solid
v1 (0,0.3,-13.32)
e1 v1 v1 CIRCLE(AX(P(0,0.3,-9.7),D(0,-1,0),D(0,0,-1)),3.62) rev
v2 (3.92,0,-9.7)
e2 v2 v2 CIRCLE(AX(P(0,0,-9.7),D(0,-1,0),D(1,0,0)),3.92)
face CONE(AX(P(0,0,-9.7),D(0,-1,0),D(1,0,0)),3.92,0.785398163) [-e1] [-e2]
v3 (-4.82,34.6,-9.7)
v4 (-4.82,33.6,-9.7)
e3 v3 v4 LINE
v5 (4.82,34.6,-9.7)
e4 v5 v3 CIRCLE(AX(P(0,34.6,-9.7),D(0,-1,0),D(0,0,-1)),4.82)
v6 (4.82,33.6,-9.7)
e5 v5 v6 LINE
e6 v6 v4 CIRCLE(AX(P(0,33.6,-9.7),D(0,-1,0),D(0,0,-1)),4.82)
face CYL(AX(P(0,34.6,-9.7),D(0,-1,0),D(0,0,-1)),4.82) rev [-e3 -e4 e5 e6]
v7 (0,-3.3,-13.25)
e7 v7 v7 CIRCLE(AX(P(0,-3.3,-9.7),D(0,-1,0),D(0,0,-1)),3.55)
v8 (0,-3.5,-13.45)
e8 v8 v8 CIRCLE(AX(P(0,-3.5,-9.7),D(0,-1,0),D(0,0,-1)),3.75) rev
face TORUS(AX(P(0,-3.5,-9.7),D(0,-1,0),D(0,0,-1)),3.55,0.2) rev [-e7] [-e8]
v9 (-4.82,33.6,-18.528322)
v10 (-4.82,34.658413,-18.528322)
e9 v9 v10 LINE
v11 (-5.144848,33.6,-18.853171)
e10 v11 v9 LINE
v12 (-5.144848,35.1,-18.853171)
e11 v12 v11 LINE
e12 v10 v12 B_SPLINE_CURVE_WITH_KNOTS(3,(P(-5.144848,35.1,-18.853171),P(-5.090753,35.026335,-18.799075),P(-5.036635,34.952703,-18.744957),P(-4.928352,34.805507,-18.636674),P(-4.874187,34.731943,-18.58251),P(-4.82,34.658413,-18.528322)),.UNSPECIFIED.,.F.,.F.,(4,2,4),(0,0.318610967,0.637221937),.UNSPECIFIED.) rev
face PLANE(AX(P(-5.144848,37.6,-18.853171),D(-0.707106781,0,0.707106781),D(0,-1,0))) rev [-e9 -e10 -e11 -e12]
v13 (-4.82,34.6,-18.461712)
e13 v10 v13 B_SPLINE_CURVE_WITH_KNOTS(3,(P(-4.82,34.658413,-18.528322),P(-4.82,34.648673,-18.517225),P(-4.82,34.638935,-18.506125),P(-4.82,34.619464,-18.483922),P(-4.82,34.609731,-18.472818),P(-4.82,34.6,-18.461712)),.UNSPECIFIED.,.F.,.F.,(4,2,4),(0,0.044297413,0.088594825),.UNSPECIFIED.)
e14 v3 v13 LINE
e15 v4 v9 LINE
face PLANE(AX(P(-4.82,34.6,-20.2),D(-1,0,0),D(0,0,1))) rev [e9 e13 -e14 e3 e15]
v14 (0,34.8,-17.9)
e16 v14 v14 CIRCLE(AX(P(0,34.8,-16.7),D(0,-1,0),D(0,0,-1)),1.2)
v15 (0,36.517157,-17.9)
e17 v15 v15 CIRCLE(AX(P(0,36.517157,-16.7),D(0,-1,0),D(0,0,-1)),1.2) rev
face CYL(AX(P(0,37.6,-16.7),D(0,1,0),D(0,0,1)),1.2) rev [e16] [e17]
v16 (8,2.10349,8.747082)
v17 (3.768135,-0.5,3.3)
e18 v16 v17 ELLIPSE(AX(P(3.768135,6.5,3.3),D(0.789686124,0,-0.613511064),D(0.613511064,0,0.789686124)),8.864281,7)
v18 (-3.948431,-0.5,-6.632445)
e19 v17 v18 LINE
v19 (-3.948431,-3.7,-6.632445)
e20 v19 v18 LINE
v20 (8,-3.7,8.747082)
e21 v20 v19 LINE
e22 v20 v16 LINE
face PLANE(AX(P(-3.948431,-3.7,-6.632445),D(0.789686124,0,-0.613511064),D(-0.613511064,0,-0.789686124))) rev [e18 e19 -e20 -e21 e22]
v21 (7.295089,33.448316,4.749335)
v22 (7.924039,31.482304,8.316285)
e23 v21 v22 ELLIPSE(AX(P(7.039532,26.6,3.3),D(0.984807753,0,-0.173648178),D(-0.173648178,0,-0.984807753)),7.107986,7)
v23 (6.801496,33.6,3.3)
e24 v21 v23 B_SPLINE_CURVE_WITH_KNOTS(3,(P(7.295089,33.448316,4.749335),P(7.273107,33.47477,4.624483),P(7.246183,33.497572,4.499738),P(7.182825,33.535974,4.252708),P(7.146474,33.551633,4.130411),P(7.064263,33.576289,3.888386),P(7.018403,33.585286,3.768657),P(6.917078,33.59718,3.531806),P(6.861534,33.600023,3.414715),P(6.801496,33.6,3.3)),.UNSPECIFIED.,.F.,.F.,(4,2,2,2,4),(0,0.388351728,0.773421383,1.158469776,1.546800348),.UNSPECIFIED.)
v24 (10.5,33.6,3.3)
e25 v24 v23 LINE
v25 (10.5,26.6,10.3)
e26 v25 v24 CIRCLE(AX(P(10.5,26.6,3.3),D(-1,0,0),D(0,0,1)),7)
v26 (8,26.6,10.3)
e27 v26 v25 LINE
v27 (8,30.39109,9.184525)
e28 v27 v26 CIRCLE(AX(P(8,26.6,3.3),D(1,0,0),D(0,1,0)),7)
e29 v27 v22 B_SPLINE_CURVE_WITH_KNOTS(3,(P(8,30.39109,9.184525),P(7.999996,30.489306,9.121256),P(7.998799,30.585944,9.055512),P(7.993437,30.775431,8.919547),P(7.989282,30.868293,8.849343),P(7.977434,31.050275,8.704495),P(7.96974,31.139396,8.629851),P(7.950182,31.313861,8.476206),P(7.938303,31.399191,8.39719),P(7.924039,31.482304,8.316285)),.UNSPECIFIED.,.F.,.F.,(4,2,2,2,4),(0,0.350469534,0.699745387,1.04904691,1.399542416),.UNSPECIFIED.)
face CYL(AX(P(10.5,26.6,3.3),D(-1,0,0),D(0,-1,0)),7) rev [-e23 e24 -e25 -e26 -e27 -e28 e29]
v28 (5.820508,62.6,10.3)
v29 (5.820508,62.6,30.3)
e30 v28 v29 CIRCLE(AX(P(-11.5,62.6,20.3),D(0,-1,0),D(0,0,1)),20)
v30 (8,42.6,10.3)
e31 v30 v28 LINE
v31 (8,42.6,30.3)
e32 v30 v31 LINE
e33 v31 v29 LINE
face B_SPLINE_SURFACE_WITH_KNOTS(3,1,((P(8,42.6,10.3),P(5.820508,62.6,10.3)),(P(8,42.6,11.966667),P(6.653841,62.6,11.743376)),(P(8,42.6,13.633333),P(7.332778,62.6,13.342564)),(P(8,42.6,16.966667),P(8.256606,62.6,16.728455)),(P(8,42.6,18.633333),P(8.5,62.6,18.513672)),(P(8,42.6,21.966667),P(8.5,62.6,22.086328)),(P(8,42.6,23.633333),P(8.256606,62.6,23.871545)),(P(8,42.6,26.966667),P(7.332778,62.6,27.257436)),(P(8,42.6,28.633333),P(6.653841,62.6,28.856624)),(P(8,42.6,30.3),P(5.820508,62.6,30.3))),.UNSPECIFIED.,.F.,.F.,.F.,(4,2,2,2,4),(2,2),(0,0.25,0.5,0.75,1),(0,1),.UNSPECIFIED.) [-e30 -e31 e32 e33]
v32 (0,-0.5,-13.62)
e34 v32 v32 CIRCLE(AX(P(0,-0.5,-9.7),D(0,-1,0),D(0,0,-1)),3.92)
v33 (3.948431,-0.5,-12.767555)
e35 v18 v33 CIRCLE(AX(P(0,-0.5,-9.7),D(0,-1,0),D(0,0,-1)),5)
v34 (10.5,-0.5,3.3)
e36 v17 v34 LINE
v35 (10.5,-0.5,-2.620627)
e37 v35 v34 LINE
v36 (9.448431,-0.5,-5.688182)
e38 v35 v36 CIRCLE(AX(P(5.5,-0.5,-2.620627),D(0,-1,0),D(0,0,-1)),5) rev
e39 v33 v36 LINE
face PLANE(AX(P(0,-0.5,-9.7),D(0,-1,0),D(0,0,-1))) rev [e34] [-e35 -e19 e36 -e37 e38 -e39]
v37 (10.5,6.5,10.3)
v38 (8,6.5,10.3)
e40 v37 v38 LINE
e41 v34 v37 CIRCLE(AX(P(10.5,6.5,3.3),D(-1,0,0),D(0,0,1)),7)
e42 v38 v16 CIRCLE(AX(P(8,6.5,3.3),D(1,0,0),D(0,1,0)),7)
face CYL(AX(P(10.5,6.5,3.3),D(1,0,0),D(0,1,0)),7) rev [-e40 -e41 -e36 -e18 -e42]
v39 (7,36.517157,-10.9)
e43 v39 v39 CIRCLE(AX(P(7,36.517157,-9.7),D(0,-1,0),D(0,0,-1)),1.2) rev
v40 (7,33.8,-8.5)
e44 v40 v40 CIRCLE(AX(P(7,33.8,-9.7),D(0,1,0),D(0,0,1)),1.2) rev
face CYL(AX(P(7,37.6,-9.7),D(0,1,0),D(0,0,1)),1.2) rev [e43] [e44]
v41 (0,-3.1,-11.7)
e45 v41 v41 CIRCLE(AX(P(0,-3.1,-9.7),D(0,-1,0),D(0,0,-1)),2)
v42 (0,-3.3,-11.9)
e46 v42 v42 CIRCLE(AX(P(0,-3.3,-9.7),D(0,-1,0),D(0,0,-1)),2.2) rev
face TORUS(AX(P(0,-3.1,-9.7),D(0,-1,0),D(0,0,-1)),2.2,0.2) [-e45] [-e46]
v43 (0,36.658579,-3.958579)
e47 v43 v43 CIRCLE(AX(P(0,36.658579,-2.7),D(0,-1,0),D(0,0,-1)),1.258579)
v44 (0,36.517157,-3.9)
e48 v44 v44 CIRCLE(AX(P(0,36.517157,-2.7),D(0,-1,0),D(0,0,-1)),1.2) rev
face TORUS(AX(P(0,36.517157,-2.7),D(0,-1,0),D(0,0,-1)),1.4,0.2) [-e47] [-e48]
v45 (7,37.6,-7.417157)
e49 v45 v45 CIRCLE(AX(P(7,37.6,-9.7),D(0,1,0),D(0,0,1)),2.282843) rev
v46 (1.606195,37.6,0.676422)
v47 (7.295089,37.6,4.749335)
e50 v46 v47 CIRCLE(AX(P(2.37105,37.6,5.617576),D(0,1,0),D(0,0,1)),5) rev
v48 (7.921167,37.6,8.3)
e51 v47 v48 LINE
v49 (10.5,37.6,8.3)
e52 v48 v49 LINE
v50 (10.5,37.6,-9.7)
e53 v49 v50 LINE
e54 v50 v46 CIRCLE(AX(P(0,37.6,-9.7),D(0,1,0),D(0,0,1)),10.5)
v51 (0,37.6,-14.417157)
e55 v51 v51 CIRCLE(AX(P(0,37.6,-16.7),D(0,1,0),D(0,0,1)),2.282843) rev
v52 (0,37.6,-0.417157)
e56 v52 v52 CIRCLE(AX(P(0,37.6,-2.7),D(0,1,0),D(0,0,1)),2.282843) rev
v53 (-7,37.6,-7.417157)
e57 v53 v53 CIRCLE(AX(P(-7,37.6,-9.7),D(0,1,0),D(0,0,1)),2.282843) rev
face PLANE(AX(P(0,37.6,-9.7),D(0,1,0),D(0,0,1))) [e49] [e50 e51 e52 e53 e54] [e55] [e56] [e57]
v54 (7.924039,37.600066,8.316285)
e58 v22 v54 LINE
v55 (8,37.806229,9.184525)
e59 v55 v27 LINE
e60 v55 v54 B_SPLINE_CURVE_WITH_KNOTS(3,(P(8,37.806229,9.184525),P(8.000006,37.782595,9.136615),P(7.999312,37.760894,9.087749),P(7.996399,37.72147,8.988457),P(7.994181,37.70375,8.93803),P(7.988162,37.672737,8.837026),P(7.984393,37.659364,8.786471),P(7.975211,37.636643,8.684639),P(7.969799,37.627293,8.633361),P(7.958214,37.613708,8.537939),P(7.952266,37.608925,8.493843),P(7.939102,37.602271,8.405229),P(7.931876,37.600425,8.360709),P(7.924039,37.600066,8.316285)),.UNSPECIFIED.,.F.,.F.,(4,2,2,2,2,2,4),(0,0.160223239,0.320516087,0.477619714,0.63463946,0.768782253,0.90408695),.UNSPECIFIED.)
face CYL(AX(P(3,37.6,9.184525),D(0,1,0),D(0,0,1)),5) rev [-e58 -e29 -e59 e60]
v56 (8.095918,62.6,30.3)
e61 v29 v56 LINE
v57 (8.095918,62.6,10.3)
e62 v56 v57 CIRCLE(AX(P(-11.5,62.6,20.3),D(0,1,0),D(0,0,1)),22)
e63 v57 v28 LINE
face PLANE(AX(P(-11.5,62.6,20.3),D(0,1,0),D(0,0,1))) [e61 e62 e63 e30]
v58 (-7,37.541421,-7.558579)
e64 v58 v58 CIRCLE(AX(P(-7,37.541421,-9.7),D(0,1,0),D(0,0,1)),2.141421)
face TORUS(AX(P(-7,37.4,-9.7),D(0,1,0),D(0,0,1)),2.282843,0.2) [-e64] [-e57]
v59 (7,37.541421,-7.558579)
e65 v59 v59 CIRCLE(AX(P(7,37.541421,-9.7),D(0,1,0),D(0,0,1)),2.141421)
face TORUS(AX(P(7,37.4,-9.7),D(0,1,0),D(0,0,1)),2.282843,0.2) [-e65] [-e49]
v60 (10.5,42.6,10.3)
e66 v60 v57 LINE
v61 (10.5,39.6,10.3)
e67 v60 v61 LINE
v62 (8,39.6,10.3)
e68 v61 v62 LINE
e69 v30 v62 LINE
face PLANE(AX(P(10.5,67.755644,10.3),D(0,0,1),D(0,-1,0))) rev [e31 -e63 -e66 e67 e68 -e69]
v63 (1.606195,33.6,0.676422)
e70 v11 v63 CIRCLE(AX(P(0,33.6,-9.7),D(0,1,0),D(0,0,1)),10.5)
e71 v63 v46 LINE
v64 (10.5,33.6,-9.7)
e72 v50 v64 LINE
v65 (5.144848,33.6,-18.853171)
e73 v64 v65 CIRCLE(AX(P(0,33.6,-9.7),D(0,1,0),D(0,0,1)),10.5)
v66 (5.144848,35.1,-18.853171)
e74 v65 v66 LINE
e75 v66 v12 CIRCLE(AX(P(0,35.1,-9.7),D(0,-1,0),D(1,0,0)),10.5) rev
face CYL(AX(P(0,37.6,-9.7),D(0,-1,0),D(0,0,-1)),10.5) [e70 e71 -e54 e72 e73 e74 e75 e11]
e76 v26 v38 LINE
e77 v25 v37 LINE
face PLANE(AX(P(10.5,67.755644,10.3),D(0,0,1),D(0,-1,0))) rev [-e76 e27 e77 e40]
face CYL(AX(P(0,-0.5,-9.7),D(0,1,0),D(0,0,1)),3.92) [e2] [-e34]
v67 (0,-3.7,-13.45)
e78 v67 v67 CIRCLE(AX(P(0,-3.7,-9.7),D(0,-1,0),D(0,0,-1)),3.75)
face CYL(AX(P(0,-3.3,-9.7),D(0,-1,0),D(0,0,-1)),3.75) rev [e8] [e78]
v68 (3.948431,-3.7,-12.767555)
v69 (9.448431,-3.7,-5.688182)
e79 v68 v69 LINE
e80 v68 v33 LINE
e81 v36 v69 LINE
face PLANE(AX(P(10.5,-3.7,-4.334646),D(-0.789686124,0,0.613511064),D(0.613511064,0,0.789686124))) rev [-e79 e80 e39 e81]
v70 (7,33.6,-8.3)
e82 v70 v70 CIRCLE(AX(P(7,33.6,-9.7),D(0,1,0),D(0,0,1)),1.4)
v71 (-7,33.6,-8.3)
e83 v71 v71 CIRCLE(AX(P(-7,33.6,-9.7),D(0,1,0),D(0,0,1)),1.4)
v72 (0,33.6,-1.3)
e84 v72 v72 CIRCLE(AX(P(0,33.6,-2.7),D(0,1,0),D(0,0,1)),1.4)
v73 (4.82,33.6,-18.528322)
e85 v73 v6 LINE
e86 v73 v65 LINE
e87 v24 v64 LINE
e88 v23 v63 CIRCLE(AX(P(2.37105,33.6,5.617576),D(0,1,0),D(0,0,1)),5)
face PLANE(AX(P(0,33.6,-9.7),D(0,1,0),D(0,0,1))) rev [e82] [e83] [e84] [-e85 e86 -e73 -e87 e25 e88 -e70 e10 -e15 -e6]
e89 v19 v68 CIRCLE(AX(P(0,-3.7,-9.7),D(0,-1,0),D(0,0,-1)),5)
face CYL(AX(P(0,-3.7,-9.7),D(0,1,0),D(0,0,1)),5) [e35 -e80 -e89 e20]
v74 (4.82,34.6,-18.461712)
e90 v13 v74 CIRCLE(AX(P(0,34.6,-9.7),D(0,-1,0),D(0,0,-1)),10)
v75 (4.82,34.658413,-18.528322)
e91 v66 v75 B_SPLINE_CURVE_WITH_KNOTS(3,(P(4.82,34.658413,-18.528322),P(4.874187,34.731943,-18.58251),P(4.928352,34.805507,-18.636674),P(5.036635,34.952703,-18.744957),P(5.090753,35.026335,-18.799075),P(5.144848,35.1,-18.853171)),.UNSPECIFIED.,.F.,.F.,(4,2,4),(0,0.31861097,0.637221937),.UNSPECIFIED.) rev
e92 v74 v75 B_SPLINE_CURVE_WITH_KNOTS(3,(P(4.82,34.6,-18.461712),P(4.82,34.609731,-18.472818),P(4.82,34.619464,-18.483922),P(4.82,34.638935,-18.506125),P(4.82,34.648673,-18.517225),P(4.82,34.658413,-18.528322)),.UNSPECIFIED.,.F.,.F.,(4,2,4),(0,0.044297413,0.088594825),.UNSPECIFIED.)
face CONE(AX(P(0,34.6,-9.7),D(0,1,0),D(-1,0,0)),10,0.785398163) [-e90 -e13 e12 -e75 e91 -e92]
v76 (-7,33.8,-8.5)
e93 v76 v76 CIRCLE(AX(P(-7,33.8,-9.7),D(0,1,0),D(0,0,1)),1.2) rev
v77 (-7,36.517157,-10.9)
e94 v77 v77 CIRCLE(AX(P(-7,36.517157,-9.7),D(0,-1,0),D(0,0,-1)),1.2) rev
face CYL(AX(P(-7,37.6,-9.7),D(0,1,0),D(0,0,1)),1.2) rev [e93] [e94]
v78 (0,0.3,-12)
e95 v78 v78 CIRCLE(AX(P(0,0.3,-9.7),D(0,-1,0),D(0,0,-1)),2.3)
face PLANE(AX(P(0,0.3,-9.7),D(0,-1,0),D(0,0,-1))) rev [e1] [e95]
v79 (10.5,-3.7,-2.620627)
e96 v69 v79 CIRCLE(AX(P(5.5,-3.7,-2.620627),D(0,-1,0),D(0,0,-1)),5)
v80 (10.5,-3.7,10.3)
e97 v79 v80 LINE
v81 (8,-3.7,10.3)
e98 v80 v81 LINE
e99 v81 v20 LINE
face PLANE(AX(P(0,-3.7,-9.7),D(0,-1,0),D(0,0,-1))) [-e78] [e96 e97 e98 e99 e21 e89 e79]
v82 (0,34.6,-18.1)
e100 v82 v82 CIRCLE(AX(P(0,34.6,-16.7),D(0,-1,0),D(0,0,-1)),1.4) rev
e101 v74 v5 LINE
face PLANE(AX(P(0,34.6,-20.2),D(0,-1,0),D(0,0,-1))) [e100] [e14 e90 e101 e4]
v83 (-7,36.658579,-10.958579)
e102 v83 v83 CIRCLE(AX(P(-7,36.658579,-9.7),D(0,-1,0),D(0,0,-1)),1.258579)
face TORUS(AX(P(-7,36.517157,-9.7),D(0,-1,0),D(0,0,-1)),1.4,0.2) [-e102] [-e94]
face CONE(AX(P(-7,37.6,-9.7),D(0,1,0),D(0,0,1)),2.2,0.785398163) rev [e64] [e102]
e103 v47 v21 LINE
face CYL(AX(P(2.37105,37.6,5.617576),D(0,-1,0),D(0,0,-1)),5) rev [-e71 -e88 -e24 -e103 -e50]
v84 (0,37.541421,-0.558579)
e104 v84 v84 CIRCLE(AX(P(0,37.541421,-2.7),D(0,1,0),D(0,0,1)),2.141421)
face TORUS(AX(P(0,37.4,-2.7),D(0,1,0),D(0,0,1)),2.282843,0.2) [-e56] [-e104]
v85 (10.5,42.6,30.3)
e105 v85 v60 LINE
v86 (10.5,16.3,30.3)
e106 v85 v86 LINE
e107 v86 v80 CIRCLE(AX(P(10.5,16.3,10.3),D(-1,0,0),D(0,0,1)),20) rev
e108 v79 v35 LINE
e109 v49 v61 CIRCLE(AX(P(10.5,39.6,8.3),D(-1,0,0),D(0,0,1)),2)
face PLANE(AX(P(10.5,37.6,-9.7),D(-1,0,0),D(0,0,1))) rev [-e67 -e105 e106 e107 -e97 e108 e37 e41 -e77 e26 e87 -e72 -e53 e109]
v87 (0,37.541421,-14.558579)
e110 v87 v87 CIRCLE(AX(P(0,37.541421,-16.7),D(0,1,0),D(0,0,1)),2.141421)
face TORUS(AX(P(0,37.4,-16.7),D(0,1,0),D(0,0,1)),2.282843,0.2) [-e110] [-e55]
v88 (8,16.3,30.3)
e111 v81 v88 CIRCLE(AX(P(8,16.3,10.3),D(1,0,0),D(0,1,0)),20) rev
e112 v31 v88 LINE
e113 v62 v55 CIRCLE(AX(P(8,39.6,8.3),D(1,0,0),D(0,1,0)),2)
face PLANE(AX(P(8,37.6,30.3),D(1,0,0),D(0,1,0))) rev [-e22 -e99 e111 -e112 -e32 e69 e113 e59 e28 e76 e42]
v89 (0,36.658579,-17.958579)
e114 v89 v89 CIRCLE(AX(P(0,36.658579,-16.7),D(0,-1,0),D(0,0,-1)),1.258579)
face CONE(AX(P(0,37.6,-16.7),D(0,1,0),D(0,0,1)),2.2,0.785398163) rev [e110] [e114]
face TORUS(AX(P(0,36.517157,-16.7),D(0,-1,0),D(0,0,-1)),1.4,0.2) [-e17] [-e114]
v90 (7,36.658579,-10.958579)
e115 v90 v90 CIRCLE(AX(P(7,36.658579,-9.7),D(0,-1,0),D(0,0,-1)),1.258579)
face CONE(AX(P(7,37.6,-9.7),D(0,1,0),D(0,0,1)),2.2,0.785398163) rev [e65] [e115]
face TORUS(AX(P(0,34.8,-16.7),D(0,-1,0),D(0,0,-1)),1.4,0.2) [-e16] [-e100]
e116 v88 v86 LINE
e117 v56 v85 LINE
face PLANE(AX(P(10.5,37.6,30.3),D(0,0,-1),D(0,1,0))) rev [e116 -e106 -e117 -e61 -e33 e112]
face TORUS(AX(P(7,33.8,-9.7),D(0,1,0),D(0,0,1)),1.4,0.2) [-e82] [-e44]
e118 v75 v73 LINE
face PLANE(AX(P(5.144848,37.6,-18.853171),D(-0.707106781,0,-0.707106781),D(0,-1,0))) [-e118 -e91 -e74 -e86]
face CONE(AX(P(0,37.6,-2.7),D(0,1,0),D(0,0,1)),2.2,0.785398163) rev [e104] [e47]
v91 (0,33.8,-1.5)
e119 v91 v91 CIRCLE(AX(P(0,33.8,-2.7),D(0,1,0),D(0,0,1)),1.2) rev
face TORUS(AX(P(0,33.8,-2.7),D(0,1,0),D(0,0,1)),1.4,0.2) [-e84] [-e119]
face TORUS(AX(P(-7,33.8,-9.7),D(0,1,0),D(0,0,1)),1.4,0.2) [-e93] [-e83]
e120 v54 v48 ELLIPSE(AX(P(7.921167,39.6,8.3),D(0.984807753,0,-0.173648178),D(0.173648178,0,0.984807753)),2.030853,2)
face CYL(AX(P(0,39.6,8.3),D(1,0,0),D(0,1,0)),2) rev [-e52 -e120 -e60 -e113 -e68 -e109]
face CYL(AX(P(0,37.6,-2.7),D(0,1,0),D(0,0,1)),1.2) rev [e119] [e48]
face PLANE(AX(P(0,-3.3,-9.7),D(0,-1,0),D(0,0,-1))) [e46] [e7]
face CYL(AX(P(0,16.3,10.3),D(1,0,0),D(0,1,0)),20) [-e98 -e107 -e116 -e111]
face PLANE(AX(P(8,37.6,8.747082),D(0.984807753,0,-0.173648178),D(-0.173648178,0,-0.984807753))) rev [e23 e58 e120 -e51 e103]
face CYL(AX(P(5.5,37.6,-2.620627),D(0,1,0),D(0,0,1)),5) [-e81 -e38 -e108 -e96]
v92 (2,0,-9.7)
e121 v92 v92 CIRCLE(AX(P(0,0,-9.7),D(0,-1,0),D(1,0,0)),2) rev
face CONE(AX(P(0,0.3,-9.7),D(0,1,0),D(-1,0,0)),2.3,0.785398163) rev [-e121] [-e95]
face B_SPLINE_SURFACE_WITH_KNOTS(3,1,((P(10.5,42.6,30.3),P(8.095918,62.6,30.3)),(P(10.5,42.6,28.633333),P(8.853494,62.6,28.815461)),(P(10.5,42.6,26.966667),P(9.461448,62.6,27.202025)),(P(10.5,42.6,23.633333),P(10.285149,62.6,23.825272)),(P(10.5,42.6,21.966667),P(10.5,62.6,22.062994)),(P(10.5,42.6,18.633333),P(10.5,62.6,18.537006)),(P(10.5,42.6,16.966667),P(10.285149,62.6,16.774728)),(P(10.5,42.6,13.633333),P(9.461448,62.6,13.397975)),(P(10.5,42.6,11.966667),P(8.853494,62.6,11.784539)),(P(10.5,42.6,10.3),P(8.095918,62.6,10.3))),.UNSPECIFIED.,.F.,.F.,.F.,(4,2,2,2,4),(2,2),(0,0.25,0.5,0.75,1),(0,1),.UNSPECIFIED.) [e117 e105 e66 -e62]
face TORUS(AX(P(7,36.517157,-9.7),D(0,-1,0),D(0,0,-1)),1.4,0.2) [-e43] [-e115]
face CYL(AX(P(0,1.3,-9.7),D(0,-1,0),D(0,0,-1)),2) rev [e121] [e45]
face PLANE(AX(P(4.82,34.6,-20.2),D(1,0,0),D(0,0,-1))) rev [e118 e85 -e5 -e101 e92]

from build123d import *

# Parameters (mm, degrees)
BOSS_EXTRUDE1_DEPTH                                 = 4
CSK_FOR_M2_COUNTERSUNK_FLAT_HEAD_SCREW1_D           = 2.4
CSK_FOR_M2_COUNTERSUNK_FLAT_HEAD_SCREW1_DEPTH       = 4
CSK_FOR_M2_COUNTERSUNK_FLAT_HEAD_SCREW1_CSINK_D     = 4.4
CSK_FOR_M2_COUNTERSUNK_FLAT_HEAD_SCREW1_CSINK_ANGLE = 90
CSK_FOR_M2_COUNTERSUNK_FLAT_HEAD_SCREW1_TIP         = 0.721032743
CUT_EXTRUDE1_DEPTH                                  = 1
BOSS_EXTRUDE2_START                                 = 0.2
SKETCH6_R                                           = 3.92
BOSS_EXTRUDE2_DEPTH                                 = 0.8
BOSS_EXTRUDE3_DEPTH                                 = 3.2
SKETCH10_R                                          = 2
CUT_EXTRUDE2_DEPTH                                  = 5
SKETCH11_R                                          = 3.75
CUT_EXTRUDE3_DEPTH                                  = 0.4
SKETCH12_W                                          = 2.5
SKETCH12_H                                          = 20
BOSS_EXTRUDE4_DEPTH                                 = 43.1
FILLET1_R                                           = 7
FILLET2_R                                           = 20
CHAMFER1_SIZE                                       = 0.3
FILLET3_R                                           = 0.2
CHAMFER2_SIZE                                       = 0.5
FILLET4_R                                           = 0.2
FILLET6_R                                           = 5
FILLET7_R                                           = 2


with BuildPart() as part:
    # Sketch2 → Boss-Extrude1 (new body)
    with BuildSketch(Plane(origin=(0, 33.6, 0), x_dir=(1, 0, 0), z_dir=(0, 1, 0))):
        with BuildLine():
            Line((10.5, 9.7), (10.5, -8.747082129))
            Line((10.5, -8.747082129), (10.5, -30.3))
            Line((10.5, -30.3), (8, -30.3))
            Line((8, -30.3), (8, -8.747082129))
            Line((8, -8.747082129), (6.236730193, 1.252917871))
            ThreePointArc((6.236730193, 1.252917871), (-9.373784375, 14.430979443), (10.5, 9.7))
        make_face()
    extrude(amount=BOSS_EXTRUDE1_DEPTH)

    # CSK for M2 Countersunk Flat Head Screw1
    with Locations(Plane(origin=(0, 37.6, 0), x_dir=(1, 0, 0), z_dir=(0, 1, 0))):
        with Locations((0, 2.7), (7, 9.7), (0, 16.7), (-7, 9.7)):
            CounterSinkHole(CSK_FOR_M2_COUNTERSUNK_FLAT_HEAD_SCREW1_D / 2, CSK_FOR_M2_COUNTERSUNK_FLAT_HEAD_SCREW1_CSINK_D / 2, depth=CSK_FOR_M2_COUNTERSUNK_FLAT_HEAD_SCREW1_DEPTH, counter_sink_angle=CSK_FOR_M2_COUNTERSUNK_FLAT_HEAD_SCREW1_CSINK_ANGLE)
            with Locations((0, 0, -(CSK_FOR_M2_COUNTERSUNK_FLAT_HEAD_SCREW1_DEPTH + CSK_FOR_M2_COUNTERSUNK_FLAT_HEAD_SCREW1_TIP / 2))):  # 118° drill point
                Cone(0, CSK_FOR_M2_COUNTERSUNK_FLAT_HEAD_SCREW1_D / 2, CSK_FOR_M2_COUNTERSUNK_FLAT_HEAD_SCREW1_TIP, mode=Mode.SUBTRACT)

    # Sketch5 → Cut-Extrude1 (cut)
    with BuildSketch(Plane.XZ.offset(-33.6)):
        with BuildLine():
            Line((-4.82, -20.2), (-4.82, -9.7))
            ThreePointArc((-4.82, -9.7), (0, -4.88), (4.82, -9.7))
            Line((4.82, -9.7), (4.82, -20.2))
            ThreePointArc((4.82, -20.2), (0, -25.02), (-4.82, -20.2))
        make_face()
    extrude(amount=-CUT_EXTRUDE1_DEPTH, mode=Mode.SUBTRACT)



with BuildPart() as body_2:
    # Sketch6 → Boss-Extrude2 (new body)
    with BuildSketch(Plane.XZ.offset(-0.5).offset(BOSS_EXTRUDE2_START)):
        with Locations(Location((0, -9.7, 0), (0, 0, 270))):
            Circle(SKETCH6_R)
    extrude(amount=BOSS_EXTRUDE2_DEPTH)

    # Sketch7 → Boss-Extrude3 (add)
    with BuildSketch(Plane.XZ.offset(0.5)):
        with BuildLine():
            Line((-3.948430619, -6.632444679), (8, 8.747082129))
            Line((8, 8.747082129), (8, 30.3))
            Line((8, 30.3), (10.5, 30.3))
            Line((10.5, 30.3), (10.5, -4.334645582))
            Line((10.5, -4.334645582), (3.948430619, -12.767555321))
            ThreePointArc((3.948430619, -12.767555321), (-3.067555321, -13.648430619), (-3.948430619, -6.632444679))
        make_face()
    extrude(amount=BOSS_EXTRUDE3_DEPTH)

    # Sketch10 → Cut-Extrude2 (cut)
    with BuildSketch(Plane.XZ.offset(3.7)):
        with Locations(Location((0, -9.7, 0), (0, 0, 270))):
            Circle(SKETCH10_R)
    extrude(amount=-CUT_EXTRUDE2_DEPTH, mode=Mode.SUBTRACT)

    # Sketch11 → Cut-Extrude3 (cut)
    with BuildSketch(Plane.XZ.offset(3.7)):
        with Locations(Location((0, -9.7, 0), (0, 0, 270))):
            Circle(SKETCH11_R)
    extrude(amount=-CUT_EXTRUDE3_DEPTH, mode=Mode.SUBTRACT)


with BuildPart() as part_1:
    add(part.part)

    add(body_2.part)  # Boss-Extrude4 merges body 2
    # Sketch12 → Boss-Extrude4 (add)
    with BuildSketch(Plane(origin=(0, -0.5, 0), x_dir=(1, 0, 0), z_dir=(0, 1, 0))):
        with Locations((9.25, -20.3)):
            Rectangle(SKETCH12_W, SKETCH12_H)
    extrude(amount=BOSS_EXTRUDE4_DEPTH)

    # Fillet1
    fillet1_edges = [part_1.edges().sort_by_distance(p)[0] for p in [
        (9.25, -0.5, 10.3),
        (9.25, 33.6, 10.3),
    ]]
    fillet(fillet1_edges, radius=FILLET1_R)

    # Fillet2
    fillet2_edges = [part_1.edges().sort_by_distance(p)[0] for p in [
        (9.25, -3.7, 30.3),
    ]]
    fillet(fillet2_edges, radius=FILLET2_R)

    # Chamfer1
    chamfer1_edges = [part_1.edges().sort_by_distance(p)[0] for p in [
        (0, 0.3, -5.78),
        (0, 0.3, -7.7),
    ]]
    chamfer(chamfer1_edges, length=CHAMFER1_SIZE)

    # Fillet3
    fillet3_edges = [part_1.edges().sort_by_distance(p)[0] for p in [
        (0, -3.3, -5.95),
        (0, -3.3, -7.7),
    ]]
    fillet(fillet3_edges, radius=FILLET3_R)

    # Chamfer2
    # the kernel refuses this chamfer: 0.5, 0.371068727 mm, written as the material it takes off along each edge
    with BuildSketch(Plane(origin=(-4.82, 34.6, -19.028322464), x_dir=(-0.8802070458412009, 0, 0.47458988237372485), z_dir=(0, -1, 0))) as chamfer2_piece_1:
        with BuildLine():
            Line((0.369059, 0), (CHAMFER2_SIZE * 0.474589882374, -CHAMFER2_SIZE * 0.880207045841))
            Line((CHAMFER2_SIZE * 0.474589882374, -CHAMFER2_SIZE * 0.880207045841), (0, 0))
            ThreePointArc((0, 0), (0.187395474, 0.001621217), (0.369059, 0))
        make_face()
    extrude(amount=2.285841494, mode=Mode.SUBTRACT)
    with BuildSketch(Plane(origin=(4.82, 34.6, -19.028322464), x_dir=(0.8802070458411981, 0, 0.47458988237373034), z_dir=(0, -1, 0))) as chamfer2_piece_2:
        with BuildLine():
            Line((0.369059, 0), (CHAMFER2_SIZE * 0.474589882374, CHAMFER2_SIZE * 0.880207045841))
            Line((CHAMFER2_SIZE * 0.474589882374, CHAMFER2_SIZE * 0.880207045841), (0, 0))
            ThreePointArc((0, 0), (0.187395474, -0.001621217), (0.369059, 0))
        make_face()
    extrude(amount=2.285841494, mode=Mode.SUBTRACT)
    with BuildSketch(Plane(origin=(0, 34.6, -9.7), x_dir=(-0.5641489275295863, 0, -0.825673051254077), z_dir=(-0.825673051254077, 0, 0.5641489275295863))) as chamfer2_piece_3_section:
        Polygon((10.5, -CHAMFER2_SIZE), (10.5 - CHAMFER2_SIZE, 0), (10.5, 0), align=None)
    chamfer2_piece_3 = revolve(axis=Axis((0, 34.6, -9.7), (0, -1, 0)), revolution_arc=68.686424342, mode=Mode.PRIVATE)
    chamfer2_piece_3 = split(chamfer2_piece_3, bisect_by=Plane(origin=(-4.82, 34.6, -9.7), z_dir=(1, 0, 0)), keep=Keep.TOP, mode=Mode.PRIVATE)
    chamfer2_piece_3 = split(chamfer2_piece_3, bisect_by=Plane(origin=(4.82, 34.6, -9.7), z_dir=(-1, 0, 0)), keep=Keep.TOP, mode=Mode.PRIVATE)
    add(chamfer2_piece_3, mode=Mode.SUBTRACT)
    with BuildSketch(Plane(origin=(-4.82, 35.885841494, -19.028322464), x_dir=(-0.8802070458412009, 0, 0.47458988237372485), z_dir=(0, -1, 0))) as chamfer2_piece_4a_section:
        with BuildLine():
            Line((0.369059, 0), (CHAMFER2_SIZE * 0.474589882374, -CHAMFER2_SIZE * 0.880207045841))
            Line((CHAMFER2_SIZE * 0.474589882374, -CHAMFER2_SIZE * 0.880207045841), (0, 0))
            ThreePointArc((0, 0), (0.187395474, 0.001621217), (0.369059, 0))
        make_face()
    chamfer2_piece_4a = extrude(amount=3.571682988, mode=Mode.PRIVATE)
    chamfer2_piece_4a = split(chamfer2_piece_4a, bisect_by=Plane(origin=(-4.82, 34.6, -19.028322464), z_dir=(0, 1, 0)), keep=Keep.TOP, mode=Mode.PRIVATE)
    with BuildSketch(Plane(origin=(0, 34.6, -9.7), x_dir=(-0.5641489275295863, 0, -0.825673051254077), z_dir=(-0.825673051254077, 0, 0.5641489275295863))) as chamfer2_piece_4b_section:
        Polygon((10.5, -CHAMFER2_SIZE), (10.5 - CHAMFER2_SIZE, 0), (10.5, 0), align=None)
    chamfer2_piece_4b = revolve(axis=Axis((0, 34.6, -9.7), (0, -1, 0)), revolution_arc=68.686424342, mode=Mode.PRIVATE)
    chamfer2_piece_4b = split(chamfer2_piece_4b, bisect_by=Plane(origin=(-4.82, 34.6, -9.7), z_dir=(-1, 0, 0)), keep=Keep.TOP, mode=Mode.PRIVATE)
    chamfer2_piece_4 = chamfer2_piece_4a & chamfer2_piece_4b
    add(chamfer2_piece_4, mode=Mode.SUBTRACT)
    with BuildSketch(Plane(origin=(0, 34.6, -9.7), x_dir=(-0.5641489275295863, 0, -0.825673051254077), z_dir=(-0.825673051254077, 0, 0.5641489275295863))) as chamfer2_piece_5a_section:
        Polygon((10.5, -CHAMFER2_SIZE), (10.5 - CHAMFER2_SIZE, 0), (10.5, 0), align=None)
    chamfer2_piece_5a = revolve(axis=Axis((0, 34.6, -9.7), (0, -1, 0)), revolution_arc=68.686424342, mode=Mode.PRIVATE)
    chamfer2_piece_5a = split(chamfer2_piece_5a, bisect_by=Plane(origin=(4.82, 34.6, -9.7), z_dir=(1, 0, 0)), keep=Keep.TOP, mode=Mode.PRIVATE)
    with BuildSketch(Plane(origin=(4.82, 35.885841494, -19.028322464), x_dir=(0.8802070458411981, 0, 0.47458988237373034), z_dir=(0, -1, 0))) as chamfer2_piece_5b_section:
        with BuildLine():
            Line((0.369059, 0), (CHAMFER2_SIZE * 0.474589882374, CHAMFER2_SIZE * 0.880207045841))
            Line((CHAMFER2_SIZE * 0.474589882374, CHAMFER2_SIZE * 0.880207045841), (0, 0))
            ThreePointArc((0, 0), (0.187395474, -0.001621217), (0.369059, 0))
        make_face()
    chamfer2_piece_5b = extrude(amount=3.571682988, mode=Mode.PRIVATE)
    chamfer2_piece_5b = split(chamfer2_piece_5b, bisect_by=Plane(origin=(4.82, 34.6, -19.028322464), z_dir=(0, 1, 0)), keep=Keep.TOP, mode=Mode.PRIVATE)
    chamfer2_piece_5 = chamfer2_piece_5a & chamfer2_piece_5b
    add(chamfer2_piece_5, mode=Mode.SUBTRACT)

    # Fillet4
    fillet4_edges = [part_1.edges().sort_by_distance(p)[0] for p in [
        (-4.8, 37.6, -9.7),
        (-5.8, 33.6, -9.7),
        (-5.8, 36.6, -9.7),
        (2.2, 37.6, -16.7),
        (1.2, 36.6, -16.7),
        (9.2, 37.6, -9.7),
        (8.2, 33.6, -9.7),
        (8.2, 36.6, -9.7),
        (2.2, 37.6, -2.7),
        (1.2, 33.6, -2.7),
        (1.2, 36.6, -2.7),
        (1.2, 34.6, -16.7),
    ]]
    fillet(fillet4_edges, radius=FILLET4_R)

    # Fillet6
    fillet6_edges = [part_1.edges().sort_by_distance(p)[0] for p in [
        (8, 34.298254778, 8.747082129),
        (6.236730193, 35.6, -1.252917871),
        (10.5, -2.1, -4.334645582),
    ]]
    fillet(fillet6_edges, radius=FILLET6_R)

    # Fillet7
    fillet7_edges = [part_1.edges().sort_by_distance(p)[0] for p in [
        (9.25, 37.6, 10.3),
    ]]
    fillet(fillet7_edges, radius=FILLET7_R)

    # Loft1: read off the stored shape, not the designer's step
    # Loft1: loft between two sections, ruled curve by curve
    loft1_from = [
        Edge.make_bspline([(10.5, 42.6, 30.3), (10.5, 42.6, 28.633333333), (10.5, 42.6, 26.966666667), (10.5, 42.6, 23.633333333), (10.5, 42.6, 21.966666667), (10.5, 42.6, 18.633333333), (10.5, 42.6, 16.966666667), (10.5, 42.6, 13.633333333), (10.5, 42.6, 11.966666667), (10.5, 42.6, 10.3)], [0, 0, 0, 0, 0.25, 0.25, 0.5, 0.5, 0.75, 0.75, 1, 1, 1, 1], 3),
        Edge.make_bspline([(8, 42.6, 10.3), (8, 42.6, 11.966666667), (8, 42.6, 13.633333333), (8, 42.6, 16.966666667), (8, 42.6, 18.633333333), (8, 42.6, 21.966666667), (8, 42.6, 23.633333333), (8, 42.6, 26.966666667), (8, 42.6, 28.633333333), (8, 42.6, 30.3)], [0, 0, 0, 0, 0.25, 0.25, 0.5, 0.5, 0.75, 0.75, 1, 1, 1, 1], 3),
        Edge.make_line((8, 42.6, 10.3), (10.5, 42.6, 10.3)),
        Edge.make_line((8, 42.6, 30.3), (10.5, 42.6, 30.3)),
    ]
    loft1_to = [
        Edge.make_bspline([(8.095917942, 62.6, 30.3), (8.8534937, 62.6, 28.815460762), (9.461447627, 62.6, 27.202025065), (10.28514852, 62.6, 23.825271703), (10.5, 62.6, 22.062993509), (10.5, 62.6, 18.537006491), (10.28514852, 62.6, 16.774728297), (9.461447627, 62.6, 13.397974935), (8.8534937, 62.6, 11.784539238), (8.095917942, 62.6, 10.3)], [0, 0, 0, 0, 0.25, 0.25, 0.5, 0.5, 0.75, 0.75, 1, 1, 1, 1], 3),
        Edge.make_bspline([(5.820508076, 62.6, 10.3), (6.653841409, 62.6, 11.743375673), (7.332777675, 62.6, 13.342564126), (8.256606348, 62.6, 16.728454883), (8.5, 62.6, 18.51367205), (8.5, 62.6, 22.08632795), (8.256606348, 62.6, 23.871545117), (7.332777675, 62.6, 27.257435874), (6.653841409, 62.6, 28.856624327), (5.820508076, 62.6, 30.3)], [0, 0, 0, 0, 0.25, 0.25, 0.5, 0.5, 0.75, 0.75, 1, 1, 1, 1], 3),
        Edge.make_line((5.820508076, 62.6, 10.3), (8.095917942, 62.6, 10.3)),
        Edge.make_line((5.820508076, 62.6, 30.3), (8.095917942, 62.6, 30.3)),
    ]
    loft1 = Solid(Shell([*[Face.make_surface_from_curves(loft1_from[k], loft1_to[k]) for k in range(4)], Face(Wire(loft1_from)), Face(Wire(loft1_to))]))
    add(loft1)


solid = part_1.part
